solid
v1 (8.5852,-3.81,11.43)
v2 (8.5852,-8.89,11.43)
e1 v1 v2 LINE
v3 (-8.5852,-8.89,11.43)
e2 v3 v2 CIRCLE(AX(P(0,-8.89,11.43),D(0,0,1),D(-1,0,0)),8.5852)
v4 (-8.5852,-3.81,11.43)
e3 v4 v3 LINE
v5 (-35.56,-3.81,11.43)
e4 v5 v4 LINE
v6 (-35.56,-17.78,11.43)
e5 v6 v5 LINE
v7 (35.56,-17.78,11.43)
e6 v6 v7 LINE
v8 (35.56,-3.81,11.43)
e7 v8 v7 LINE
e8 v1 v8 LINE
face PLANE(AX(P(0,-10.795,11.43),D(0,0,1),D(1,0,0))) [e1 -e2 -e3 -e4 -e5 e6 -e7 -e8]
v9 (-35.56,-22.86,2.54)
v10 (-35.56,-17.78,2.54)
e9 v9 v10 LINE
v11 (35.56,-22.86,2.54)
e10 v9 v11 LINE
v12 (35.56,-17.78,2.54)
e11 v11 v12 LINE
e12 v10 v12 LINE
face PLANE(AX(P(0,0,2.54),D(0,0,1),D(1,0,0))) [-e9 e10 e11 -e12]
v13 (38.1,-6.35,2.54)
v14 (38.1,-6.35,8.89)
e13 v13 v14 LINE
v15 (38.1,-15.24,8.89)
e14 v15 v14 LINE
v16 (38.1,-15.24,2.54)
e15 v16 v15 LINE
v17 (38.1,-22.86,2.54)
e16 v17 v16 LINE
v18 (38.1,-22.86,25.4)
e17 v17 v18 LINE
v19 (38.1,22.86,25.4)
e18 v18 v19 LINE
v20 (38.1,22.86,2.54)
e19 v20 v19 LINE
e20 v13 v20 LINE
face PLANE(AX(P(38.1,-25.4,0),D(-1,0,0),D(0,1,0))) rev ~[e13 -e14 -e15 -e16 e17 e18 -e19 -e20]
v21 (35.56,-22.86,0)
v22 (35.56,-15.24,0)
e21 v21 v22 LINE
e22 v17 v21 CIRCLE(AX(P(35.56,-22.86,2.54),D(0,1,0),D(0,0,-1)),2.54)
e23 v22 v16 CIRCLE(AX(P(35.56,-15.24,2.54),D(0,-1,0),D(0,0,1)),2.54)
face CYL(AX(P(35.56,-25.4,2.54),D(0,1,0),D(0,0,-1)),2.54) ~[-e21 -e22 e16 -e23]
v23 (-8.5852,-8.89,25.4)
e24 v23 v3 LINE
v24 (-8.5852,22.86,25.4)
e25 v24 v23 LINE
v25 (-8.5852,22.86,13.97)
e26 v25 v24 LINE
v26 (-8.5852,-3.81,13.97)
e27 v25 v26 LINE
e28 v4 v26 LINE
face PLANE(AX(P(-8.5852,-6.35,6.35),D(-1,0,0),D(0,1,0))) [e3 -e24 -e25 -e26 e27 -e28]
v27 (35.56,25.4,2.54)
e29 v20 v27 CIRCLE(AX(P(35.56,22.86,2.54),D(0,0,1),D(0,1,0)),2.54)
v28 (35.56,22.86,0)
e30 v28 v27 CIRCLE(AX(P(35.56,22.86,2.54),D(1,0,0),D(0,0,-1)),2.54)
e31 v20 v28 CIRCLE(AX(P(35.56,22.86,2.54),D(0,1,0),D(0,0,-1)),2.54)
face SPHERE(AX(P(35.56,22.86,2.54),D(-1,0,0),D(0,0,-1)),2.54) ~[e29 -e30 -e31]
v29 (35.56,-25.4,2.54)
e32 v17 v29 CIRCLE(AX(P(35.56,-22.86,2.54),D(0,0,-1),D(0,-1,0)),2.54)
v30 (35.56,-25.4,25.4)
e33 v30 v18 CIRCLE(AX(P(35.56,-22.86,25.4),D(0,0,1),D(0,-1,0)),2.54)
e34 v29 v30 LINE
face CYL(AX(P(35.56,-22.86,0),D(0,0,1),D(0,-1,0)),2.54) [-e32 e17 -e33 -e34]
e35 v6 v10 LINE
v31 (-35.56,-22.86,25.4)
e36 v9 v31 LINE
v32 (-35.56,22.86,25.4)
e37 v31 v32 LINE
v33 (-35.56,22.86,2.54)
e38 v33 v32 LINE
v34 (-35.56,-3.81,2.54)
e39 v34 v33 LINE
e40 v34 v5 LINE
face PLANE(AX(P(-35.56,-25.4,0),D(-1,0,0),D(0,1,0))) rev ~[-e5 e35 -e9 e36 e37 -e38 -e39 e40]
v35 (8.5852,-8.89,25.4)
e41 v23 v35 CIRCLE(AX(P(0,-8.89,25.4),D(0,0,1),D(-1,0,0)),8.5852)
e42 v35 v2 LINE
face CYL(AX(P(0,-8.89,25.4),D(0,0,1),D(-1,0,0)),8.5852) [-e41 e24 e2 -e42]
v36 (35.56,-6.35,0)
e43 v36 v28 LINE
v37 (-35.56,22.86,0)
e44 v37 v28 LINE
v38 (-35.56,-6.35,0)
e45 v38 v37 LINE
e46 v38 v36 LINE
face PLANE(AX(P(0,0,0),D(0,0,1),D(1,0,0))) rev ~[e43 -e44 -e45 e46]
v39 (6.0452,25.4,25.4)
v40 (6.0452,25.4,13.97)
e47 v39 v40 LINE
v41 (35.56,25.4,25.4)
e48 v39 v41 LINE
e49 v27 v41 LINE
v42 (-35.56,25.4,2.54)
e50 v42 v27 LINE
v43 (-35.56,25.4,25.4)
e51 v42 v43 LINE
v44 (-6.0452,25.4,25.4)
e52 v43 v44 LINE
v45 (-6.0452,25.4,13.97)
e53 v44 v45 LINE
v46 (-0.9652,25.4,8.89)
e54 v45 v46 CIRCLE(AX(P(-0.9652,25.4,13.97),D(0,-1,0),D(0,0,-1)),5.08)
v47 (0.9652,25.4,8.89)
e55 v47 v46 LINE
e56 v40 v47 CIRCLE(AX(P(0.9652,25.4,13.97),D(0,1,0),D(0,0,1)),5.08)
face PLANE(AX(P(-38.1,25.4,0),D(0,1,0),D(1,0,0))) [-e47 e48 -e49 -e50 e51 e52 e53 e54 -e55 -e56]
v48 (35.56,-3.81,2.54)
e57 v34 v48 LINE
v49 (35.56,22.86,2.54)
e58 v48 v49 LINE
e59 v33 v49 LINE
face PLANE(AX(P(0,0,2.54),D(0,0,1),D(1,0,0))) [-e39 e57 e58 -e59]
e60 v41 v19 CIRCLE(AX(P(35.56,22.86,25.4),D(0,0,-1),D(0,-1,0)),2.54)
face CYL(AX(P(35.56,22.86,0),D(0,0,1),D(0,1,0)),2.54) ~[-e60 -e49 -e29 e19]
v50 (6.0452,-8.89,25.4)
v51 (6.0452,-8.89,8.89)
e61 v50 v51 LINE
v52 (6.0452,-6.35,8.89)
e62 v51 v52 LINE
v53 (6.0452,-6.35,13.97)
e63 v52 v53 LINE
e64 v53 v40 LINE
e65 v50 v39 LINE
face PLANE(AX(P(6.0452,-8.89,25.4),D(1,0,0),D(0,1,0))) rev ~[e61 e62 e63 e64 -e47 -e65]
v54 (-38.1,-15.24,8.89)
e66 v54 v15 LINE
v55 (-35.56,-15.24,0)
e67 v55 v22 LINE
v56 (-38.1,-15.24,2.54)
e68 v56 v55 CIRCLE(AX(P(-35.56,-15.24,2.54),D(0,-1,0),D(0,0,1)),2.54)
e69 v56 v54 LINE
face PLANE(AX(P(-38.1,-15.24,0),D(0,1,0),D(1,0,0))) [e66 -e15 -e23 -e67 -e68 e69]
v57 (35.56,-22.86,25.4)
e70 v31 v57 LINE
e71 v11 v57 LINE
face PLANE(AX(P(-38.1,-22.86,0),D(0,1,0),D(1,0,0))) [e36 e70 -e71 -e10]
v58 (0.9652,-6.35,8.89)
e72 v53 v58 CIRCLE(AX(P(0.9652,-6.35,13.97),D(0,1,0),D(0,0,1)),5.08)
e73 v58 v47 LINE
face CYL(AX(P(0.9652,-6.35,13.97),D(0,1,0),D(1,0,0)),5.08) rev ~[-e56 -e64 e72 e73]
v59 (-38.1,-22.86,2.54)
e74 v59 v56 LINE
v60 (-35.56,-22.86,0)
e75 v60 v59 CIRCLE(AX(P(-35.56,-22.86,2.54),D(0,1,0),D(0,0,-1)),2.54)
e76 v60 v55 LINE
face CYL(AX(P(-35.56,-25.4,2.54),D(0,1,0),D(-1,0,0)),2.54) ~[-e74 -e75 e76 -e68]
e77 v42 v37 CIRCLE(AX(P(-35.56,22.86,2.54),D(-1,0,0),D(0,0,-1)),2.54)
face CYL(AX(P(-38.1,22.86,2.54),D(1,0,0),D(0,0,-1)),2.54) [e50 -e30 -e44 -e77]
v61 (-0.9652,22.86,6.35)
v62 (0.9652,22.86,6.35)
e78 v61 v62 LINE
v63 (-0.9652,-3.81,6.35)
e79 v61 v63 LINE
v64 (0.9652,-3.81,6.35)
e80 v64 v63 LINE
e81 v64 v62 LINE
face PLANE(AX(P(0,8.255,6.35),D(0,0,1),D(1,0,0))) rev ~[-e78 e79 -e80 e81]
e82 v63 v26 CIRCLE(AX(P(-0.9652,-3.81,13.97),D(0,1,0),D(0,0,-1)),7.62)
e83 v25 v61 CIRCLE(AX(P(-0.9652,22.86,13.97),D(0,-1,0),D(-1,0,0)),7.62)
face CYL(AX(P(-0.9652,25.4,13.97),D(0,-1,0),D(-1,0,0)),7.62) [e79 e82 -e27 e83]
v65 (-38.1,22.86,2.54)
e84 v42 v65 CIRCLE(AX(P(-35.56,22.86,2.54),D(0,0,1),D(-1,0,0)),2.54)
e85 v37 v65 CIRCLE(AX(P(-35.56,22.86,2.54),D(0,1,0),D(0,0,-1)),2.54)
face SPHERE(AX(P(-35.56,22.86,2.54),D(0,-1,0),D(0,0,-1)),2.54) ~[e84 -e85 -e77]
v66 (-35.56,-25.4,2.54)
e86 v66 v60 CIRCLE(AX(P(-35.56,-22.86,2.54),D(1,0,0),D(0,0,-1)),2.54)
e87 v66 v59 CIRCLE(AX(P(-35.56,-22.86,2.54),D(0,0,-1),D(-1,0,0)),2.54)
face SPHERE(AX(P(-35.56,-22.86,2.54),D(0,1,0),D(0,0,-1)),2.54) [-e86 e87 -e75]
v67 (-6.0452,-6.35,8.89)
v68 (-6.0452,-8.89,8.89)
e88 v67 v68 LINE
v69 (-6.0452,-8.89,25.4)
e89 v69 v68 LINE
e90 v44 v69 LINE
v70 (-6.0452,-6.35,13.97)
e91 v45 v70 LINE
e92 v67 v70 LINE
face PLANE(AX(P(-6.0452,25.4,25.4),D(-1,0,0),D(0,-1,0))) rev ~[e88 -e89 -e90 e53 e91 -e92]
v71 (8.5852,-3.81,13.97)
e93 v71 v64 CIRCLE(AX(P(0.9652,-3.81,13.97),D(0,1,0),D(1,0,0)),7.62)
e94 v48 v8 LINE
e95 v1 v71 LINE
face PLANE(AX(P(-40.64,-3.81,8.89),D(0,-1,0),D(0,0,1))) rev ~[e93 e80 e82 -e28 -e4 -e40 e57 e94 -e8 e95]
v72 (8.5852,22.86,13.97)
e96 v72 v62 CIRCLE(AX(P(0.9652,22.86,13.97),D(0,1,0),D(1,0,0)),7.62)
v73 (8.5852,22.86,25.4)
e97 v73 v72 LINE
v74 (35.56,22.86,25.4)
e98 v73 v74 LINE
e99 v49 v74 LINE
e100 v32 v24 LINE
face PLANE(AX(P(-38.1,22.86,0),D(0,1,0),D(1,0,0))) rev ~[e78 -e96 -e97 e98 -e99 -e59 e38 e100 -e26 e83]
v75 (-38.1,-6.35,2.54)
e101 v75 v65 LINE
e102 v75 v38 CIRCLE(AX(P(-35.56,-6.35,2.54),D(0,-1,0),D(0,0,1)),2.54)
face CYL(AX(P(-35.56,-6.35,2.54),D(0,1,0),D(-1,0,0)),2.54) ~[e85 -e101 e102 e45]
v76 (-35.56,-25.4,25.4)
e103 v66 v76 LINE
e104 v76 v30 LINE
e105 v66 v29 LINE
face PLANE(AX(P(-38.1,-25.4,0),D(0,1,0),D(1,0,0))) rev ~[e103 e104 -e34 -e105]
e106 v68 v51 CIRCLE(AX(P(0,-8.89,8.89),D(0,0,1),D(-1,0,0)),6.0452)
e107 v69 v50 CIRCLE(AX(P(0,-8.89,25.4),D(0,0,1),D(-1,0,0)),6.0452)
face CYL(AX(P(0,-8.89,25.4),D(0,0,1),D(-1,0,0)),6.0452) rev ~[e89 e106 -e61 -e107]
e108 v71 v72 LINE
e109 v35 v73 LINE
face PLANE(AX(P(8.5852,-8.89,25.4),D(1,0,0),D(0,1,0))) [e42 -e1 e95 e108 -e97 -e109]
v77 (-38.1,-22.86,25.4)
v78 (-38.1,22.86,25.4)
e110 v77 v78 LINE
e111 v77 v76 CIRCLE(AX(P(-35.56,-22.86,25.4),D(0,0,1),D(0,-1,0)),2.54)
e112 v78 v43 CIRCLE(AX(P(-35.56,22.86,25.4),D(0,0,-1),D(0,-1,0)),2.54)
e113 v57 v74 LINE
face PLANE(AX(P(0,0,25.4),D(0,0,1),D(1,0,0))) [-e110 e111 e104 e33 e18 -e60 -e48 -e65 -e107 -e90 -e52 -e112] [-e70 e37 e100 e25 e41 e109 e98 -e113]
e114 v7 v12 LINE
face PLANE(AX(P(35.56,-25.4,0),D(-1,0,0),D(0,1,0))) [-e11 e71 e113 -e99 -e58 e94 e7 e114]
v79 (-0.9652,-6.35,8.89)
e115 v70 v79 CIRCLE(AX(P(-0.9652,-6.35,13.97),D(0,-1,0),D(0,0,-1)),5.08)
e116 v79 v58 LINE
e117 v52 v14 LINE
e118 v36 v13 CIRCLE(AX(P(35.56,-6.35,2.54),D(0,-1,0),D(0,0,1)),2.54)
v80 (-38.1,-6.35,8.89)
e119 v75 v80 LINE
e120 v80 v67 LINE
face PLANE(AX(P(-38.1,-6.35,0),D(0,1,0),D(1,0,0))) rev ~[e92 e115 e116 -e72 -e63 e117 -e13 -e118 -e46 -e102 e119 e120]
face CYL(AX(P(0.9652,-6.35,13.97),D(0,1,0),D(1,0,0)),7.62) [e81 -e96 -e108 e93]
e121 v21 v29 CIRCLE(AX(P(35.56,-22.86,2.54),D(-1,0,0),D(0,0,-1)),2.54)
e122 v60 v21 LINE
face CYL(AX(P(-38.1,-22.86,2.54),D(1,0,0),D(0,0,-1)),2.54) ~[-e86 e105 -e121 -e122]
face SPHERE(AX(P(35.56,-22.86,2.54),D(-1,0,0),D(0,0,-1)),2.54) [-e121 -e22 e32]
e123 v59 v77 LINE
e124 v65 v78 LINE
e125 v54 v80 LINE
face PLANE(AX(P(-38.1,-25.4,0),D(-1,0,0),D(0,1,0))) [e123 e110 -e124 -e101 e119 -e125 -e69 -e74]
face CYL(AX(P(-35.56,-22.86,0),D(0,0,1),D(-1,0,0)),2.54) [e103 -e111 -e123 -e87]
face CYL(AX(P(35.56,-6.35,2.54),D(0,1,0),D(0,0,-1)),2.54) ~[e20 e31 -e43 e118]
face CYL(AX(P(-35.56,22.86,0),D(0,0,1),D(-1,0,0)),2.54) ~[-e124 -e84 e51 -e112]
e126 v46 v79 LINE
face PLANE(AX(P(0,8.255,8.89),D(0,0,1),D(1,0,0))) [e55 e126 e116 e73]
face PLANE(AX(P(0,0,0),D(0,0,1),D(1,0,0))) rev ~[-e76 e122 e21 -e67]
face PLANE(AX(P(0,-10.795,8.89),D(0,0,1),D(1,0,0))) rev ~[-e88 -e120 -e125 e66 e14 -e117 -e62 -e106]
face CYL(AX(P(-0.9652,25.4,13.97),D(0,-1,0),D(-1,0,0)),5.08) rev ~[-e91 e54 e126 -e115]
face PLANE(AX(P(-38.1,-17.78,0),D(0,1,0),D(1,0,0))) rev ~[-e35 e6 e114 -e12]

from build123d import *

# Parameters (mm, degrees)
F0_W        = 76.2
F0_H        = 50.8
F2_DEPTH    = 25.4
F1_W        = 76.2
F1_H        = 8.89
F3_DEPTH    = 8.89
F4_R        = 2.54
F6_DEPTH    = 16.51
F7_R        = 5.08
F8_T        = 2.54
F8_T3_DEPTH = 10.16
F8_T5_DEPTH = 37.1348
F8_T7_DEPTH = 37.1348
F8_T9_DEPTH = 81.28


# Not quite as in the source:
# - a shell that OpenCascade refuses in one call is made with other operations: the cavity is built on its own and cut out


with BuildPart() as f2:
    # F0 (on Top) → F2 (new body)
    with BuildSketch(Plane.XY):
        Rectangle(F0_W, F0_H)
    extrude(amount=F2_DEPTH)

    # F1 (on face) → F3 (cut)
    with BuildSketch(Plane.XY):
        with Locations((0, -10.795)):
            Rectangle(F1_W, F1_H)
    extrude(amount=F3_DEPTH, mode=Mode.SUBTRACT)

    # F4
    f4_edges = [f2.edges().sort_by_distance(p)[0] for p in [
        (-38.1, 9.525, 0),
        (0, 25.4, 0),
        (38.1, 9.525, 0),
        (-38.1, -20.32, 0),
        (0, -25.4, 0),
        (38.1, -20.32, 0),
        (-38.1, 25.4, 12.7),
        (-38.1, -25.4, 12.7),
        (38.1, -25.4, 12.7),
        (38.1, 25.4, 12.7),
    ]]
    fillet(f4_edges, radius=F4_R)

    # F5 (on face) → F6 (cut, through all)
    with BuildSketch(Plane.XY.offset(25.4)):
        Polygon((6.0452, 25.4), (-6.0452, 25.4), (-6.0452, -6.35), (-6.0452, -8.89), (6.0452, -8.89), (6.0452, -6.35), align=None)
        with BuildLine():
            Line((6.0452, -8.89), (-6.0452, -8.89))
            ThreePointArc((-6.0452, -8.89), (0, -14.9352), (6.0452, -8.89))
        make_face()
    extrude(amount=-F6_DEPTH, mode=Mode.SUBTRACT)

    # F7
    f7_edges = [f2.edges().sort_by_distance(p)[0] for p in [
        (-6.0452, 9.525, 8.89),
        (6.0452, 9.525, 8.89),
    ]]
    fillet(f7_edges, radius=F7_R)

    # F8: shell of thickness 2.54, made by hand


with BuildPart() as f8_core1:
    # F8_t2: copy of F2
    add(f2.part)

    # the walls: a layer under each face that stays
    f8_faces = [f8_core1.faces().sort_by_distance(p)[0] for p in [
        (23.7066666667, 25.4, 21.59),
        (-6.0452, 8.255, 17.145),
        (-4.5573024484, 9.525, 10.3778975516),
        (0, 9.525, 8.89),
        (4.5573024484, 9.525, 10.3778975516),
        (6.0452, 8.255, 17.145),
        (0, -6.35, 6.985),
        (0, -14.9352, 17.145),
        (-25.4, -13.7583333333, 8.89),
        (38.1, 0, 13.97),
        (0, -25.4, 13.97),
        (-38.1, 0, 13.97),
        (0, 8.255, 0),
        (0, -15.24, 4.445),
        (0, -19.05, 0),
    ]]
    thicken(f8_faces, amount=-F8_T, mode=Mode.SUBTRACT)

    # F8_s4 → F8_t3 (cut)
    with BuildSketch(Plane.XY.offset(6.35)):
        Polygon((-6.0198, -6.3754), (-8.5852, -6.35), (-8.5852, -3.81), (-6.0452, -3.81), align=None)
        Polygon((6.0198, -6.3754), (8.5852, -6.35), (8.5852, -3.81), (6.0452, -3.81), align=None)
    extrude(amount=F8_T3_DEPTH, mode=Mode.SUBTRACT)

    # F8_s6 → F8_t5 (cut)
    with BuildSketch(Plane.YZ.offset(3.5052)):
        Polygon((-6.3754, 8.8646), (-3.81, 8.89), (-3.81, 11.43), (-6.35, 11.43), align=None)
    extrude(amount=F8_T5_DEPTH, mode=Mode.SUBTRACT)

    # F8_s8 → F8_t7 (cut)
    with BuildSketch(Plane.YZ.offset(-40.64)):
        Polygon((-6.3754, 8.8646), (-3.81, 8.89), (-3.81, 11.43), (-6.35, 11.43), align=None)
    extrude(amount=F8_T7_DEPTH, mode=Mode.SUBTRACT)

    # F8_s10 → F8_t9 (cut)
    with BuildSketch(Plane.YZ.offset(-40.64)):
        Polygon((-15.2146, 8.8646), (-15.24, 11.43), (-17.78, 11.43), (-17.78, 8.89), align=None)
    extrude(amount=F8_T9_DEPTH, mode=Mode.SUBTRACT)


with BuildPart() as f2_1:
    add(f2.part)

    # what is left inside the walls is the cavity
    f8_cavity = [f8_core1.part.solids().sort_by_distance(p)[0] for p in [
        (-17.78, 7.62, 25.3746),
    ]]
    add(f8_cavity, mode=Mode.SUBTRACT)


solid = f2_1.part
